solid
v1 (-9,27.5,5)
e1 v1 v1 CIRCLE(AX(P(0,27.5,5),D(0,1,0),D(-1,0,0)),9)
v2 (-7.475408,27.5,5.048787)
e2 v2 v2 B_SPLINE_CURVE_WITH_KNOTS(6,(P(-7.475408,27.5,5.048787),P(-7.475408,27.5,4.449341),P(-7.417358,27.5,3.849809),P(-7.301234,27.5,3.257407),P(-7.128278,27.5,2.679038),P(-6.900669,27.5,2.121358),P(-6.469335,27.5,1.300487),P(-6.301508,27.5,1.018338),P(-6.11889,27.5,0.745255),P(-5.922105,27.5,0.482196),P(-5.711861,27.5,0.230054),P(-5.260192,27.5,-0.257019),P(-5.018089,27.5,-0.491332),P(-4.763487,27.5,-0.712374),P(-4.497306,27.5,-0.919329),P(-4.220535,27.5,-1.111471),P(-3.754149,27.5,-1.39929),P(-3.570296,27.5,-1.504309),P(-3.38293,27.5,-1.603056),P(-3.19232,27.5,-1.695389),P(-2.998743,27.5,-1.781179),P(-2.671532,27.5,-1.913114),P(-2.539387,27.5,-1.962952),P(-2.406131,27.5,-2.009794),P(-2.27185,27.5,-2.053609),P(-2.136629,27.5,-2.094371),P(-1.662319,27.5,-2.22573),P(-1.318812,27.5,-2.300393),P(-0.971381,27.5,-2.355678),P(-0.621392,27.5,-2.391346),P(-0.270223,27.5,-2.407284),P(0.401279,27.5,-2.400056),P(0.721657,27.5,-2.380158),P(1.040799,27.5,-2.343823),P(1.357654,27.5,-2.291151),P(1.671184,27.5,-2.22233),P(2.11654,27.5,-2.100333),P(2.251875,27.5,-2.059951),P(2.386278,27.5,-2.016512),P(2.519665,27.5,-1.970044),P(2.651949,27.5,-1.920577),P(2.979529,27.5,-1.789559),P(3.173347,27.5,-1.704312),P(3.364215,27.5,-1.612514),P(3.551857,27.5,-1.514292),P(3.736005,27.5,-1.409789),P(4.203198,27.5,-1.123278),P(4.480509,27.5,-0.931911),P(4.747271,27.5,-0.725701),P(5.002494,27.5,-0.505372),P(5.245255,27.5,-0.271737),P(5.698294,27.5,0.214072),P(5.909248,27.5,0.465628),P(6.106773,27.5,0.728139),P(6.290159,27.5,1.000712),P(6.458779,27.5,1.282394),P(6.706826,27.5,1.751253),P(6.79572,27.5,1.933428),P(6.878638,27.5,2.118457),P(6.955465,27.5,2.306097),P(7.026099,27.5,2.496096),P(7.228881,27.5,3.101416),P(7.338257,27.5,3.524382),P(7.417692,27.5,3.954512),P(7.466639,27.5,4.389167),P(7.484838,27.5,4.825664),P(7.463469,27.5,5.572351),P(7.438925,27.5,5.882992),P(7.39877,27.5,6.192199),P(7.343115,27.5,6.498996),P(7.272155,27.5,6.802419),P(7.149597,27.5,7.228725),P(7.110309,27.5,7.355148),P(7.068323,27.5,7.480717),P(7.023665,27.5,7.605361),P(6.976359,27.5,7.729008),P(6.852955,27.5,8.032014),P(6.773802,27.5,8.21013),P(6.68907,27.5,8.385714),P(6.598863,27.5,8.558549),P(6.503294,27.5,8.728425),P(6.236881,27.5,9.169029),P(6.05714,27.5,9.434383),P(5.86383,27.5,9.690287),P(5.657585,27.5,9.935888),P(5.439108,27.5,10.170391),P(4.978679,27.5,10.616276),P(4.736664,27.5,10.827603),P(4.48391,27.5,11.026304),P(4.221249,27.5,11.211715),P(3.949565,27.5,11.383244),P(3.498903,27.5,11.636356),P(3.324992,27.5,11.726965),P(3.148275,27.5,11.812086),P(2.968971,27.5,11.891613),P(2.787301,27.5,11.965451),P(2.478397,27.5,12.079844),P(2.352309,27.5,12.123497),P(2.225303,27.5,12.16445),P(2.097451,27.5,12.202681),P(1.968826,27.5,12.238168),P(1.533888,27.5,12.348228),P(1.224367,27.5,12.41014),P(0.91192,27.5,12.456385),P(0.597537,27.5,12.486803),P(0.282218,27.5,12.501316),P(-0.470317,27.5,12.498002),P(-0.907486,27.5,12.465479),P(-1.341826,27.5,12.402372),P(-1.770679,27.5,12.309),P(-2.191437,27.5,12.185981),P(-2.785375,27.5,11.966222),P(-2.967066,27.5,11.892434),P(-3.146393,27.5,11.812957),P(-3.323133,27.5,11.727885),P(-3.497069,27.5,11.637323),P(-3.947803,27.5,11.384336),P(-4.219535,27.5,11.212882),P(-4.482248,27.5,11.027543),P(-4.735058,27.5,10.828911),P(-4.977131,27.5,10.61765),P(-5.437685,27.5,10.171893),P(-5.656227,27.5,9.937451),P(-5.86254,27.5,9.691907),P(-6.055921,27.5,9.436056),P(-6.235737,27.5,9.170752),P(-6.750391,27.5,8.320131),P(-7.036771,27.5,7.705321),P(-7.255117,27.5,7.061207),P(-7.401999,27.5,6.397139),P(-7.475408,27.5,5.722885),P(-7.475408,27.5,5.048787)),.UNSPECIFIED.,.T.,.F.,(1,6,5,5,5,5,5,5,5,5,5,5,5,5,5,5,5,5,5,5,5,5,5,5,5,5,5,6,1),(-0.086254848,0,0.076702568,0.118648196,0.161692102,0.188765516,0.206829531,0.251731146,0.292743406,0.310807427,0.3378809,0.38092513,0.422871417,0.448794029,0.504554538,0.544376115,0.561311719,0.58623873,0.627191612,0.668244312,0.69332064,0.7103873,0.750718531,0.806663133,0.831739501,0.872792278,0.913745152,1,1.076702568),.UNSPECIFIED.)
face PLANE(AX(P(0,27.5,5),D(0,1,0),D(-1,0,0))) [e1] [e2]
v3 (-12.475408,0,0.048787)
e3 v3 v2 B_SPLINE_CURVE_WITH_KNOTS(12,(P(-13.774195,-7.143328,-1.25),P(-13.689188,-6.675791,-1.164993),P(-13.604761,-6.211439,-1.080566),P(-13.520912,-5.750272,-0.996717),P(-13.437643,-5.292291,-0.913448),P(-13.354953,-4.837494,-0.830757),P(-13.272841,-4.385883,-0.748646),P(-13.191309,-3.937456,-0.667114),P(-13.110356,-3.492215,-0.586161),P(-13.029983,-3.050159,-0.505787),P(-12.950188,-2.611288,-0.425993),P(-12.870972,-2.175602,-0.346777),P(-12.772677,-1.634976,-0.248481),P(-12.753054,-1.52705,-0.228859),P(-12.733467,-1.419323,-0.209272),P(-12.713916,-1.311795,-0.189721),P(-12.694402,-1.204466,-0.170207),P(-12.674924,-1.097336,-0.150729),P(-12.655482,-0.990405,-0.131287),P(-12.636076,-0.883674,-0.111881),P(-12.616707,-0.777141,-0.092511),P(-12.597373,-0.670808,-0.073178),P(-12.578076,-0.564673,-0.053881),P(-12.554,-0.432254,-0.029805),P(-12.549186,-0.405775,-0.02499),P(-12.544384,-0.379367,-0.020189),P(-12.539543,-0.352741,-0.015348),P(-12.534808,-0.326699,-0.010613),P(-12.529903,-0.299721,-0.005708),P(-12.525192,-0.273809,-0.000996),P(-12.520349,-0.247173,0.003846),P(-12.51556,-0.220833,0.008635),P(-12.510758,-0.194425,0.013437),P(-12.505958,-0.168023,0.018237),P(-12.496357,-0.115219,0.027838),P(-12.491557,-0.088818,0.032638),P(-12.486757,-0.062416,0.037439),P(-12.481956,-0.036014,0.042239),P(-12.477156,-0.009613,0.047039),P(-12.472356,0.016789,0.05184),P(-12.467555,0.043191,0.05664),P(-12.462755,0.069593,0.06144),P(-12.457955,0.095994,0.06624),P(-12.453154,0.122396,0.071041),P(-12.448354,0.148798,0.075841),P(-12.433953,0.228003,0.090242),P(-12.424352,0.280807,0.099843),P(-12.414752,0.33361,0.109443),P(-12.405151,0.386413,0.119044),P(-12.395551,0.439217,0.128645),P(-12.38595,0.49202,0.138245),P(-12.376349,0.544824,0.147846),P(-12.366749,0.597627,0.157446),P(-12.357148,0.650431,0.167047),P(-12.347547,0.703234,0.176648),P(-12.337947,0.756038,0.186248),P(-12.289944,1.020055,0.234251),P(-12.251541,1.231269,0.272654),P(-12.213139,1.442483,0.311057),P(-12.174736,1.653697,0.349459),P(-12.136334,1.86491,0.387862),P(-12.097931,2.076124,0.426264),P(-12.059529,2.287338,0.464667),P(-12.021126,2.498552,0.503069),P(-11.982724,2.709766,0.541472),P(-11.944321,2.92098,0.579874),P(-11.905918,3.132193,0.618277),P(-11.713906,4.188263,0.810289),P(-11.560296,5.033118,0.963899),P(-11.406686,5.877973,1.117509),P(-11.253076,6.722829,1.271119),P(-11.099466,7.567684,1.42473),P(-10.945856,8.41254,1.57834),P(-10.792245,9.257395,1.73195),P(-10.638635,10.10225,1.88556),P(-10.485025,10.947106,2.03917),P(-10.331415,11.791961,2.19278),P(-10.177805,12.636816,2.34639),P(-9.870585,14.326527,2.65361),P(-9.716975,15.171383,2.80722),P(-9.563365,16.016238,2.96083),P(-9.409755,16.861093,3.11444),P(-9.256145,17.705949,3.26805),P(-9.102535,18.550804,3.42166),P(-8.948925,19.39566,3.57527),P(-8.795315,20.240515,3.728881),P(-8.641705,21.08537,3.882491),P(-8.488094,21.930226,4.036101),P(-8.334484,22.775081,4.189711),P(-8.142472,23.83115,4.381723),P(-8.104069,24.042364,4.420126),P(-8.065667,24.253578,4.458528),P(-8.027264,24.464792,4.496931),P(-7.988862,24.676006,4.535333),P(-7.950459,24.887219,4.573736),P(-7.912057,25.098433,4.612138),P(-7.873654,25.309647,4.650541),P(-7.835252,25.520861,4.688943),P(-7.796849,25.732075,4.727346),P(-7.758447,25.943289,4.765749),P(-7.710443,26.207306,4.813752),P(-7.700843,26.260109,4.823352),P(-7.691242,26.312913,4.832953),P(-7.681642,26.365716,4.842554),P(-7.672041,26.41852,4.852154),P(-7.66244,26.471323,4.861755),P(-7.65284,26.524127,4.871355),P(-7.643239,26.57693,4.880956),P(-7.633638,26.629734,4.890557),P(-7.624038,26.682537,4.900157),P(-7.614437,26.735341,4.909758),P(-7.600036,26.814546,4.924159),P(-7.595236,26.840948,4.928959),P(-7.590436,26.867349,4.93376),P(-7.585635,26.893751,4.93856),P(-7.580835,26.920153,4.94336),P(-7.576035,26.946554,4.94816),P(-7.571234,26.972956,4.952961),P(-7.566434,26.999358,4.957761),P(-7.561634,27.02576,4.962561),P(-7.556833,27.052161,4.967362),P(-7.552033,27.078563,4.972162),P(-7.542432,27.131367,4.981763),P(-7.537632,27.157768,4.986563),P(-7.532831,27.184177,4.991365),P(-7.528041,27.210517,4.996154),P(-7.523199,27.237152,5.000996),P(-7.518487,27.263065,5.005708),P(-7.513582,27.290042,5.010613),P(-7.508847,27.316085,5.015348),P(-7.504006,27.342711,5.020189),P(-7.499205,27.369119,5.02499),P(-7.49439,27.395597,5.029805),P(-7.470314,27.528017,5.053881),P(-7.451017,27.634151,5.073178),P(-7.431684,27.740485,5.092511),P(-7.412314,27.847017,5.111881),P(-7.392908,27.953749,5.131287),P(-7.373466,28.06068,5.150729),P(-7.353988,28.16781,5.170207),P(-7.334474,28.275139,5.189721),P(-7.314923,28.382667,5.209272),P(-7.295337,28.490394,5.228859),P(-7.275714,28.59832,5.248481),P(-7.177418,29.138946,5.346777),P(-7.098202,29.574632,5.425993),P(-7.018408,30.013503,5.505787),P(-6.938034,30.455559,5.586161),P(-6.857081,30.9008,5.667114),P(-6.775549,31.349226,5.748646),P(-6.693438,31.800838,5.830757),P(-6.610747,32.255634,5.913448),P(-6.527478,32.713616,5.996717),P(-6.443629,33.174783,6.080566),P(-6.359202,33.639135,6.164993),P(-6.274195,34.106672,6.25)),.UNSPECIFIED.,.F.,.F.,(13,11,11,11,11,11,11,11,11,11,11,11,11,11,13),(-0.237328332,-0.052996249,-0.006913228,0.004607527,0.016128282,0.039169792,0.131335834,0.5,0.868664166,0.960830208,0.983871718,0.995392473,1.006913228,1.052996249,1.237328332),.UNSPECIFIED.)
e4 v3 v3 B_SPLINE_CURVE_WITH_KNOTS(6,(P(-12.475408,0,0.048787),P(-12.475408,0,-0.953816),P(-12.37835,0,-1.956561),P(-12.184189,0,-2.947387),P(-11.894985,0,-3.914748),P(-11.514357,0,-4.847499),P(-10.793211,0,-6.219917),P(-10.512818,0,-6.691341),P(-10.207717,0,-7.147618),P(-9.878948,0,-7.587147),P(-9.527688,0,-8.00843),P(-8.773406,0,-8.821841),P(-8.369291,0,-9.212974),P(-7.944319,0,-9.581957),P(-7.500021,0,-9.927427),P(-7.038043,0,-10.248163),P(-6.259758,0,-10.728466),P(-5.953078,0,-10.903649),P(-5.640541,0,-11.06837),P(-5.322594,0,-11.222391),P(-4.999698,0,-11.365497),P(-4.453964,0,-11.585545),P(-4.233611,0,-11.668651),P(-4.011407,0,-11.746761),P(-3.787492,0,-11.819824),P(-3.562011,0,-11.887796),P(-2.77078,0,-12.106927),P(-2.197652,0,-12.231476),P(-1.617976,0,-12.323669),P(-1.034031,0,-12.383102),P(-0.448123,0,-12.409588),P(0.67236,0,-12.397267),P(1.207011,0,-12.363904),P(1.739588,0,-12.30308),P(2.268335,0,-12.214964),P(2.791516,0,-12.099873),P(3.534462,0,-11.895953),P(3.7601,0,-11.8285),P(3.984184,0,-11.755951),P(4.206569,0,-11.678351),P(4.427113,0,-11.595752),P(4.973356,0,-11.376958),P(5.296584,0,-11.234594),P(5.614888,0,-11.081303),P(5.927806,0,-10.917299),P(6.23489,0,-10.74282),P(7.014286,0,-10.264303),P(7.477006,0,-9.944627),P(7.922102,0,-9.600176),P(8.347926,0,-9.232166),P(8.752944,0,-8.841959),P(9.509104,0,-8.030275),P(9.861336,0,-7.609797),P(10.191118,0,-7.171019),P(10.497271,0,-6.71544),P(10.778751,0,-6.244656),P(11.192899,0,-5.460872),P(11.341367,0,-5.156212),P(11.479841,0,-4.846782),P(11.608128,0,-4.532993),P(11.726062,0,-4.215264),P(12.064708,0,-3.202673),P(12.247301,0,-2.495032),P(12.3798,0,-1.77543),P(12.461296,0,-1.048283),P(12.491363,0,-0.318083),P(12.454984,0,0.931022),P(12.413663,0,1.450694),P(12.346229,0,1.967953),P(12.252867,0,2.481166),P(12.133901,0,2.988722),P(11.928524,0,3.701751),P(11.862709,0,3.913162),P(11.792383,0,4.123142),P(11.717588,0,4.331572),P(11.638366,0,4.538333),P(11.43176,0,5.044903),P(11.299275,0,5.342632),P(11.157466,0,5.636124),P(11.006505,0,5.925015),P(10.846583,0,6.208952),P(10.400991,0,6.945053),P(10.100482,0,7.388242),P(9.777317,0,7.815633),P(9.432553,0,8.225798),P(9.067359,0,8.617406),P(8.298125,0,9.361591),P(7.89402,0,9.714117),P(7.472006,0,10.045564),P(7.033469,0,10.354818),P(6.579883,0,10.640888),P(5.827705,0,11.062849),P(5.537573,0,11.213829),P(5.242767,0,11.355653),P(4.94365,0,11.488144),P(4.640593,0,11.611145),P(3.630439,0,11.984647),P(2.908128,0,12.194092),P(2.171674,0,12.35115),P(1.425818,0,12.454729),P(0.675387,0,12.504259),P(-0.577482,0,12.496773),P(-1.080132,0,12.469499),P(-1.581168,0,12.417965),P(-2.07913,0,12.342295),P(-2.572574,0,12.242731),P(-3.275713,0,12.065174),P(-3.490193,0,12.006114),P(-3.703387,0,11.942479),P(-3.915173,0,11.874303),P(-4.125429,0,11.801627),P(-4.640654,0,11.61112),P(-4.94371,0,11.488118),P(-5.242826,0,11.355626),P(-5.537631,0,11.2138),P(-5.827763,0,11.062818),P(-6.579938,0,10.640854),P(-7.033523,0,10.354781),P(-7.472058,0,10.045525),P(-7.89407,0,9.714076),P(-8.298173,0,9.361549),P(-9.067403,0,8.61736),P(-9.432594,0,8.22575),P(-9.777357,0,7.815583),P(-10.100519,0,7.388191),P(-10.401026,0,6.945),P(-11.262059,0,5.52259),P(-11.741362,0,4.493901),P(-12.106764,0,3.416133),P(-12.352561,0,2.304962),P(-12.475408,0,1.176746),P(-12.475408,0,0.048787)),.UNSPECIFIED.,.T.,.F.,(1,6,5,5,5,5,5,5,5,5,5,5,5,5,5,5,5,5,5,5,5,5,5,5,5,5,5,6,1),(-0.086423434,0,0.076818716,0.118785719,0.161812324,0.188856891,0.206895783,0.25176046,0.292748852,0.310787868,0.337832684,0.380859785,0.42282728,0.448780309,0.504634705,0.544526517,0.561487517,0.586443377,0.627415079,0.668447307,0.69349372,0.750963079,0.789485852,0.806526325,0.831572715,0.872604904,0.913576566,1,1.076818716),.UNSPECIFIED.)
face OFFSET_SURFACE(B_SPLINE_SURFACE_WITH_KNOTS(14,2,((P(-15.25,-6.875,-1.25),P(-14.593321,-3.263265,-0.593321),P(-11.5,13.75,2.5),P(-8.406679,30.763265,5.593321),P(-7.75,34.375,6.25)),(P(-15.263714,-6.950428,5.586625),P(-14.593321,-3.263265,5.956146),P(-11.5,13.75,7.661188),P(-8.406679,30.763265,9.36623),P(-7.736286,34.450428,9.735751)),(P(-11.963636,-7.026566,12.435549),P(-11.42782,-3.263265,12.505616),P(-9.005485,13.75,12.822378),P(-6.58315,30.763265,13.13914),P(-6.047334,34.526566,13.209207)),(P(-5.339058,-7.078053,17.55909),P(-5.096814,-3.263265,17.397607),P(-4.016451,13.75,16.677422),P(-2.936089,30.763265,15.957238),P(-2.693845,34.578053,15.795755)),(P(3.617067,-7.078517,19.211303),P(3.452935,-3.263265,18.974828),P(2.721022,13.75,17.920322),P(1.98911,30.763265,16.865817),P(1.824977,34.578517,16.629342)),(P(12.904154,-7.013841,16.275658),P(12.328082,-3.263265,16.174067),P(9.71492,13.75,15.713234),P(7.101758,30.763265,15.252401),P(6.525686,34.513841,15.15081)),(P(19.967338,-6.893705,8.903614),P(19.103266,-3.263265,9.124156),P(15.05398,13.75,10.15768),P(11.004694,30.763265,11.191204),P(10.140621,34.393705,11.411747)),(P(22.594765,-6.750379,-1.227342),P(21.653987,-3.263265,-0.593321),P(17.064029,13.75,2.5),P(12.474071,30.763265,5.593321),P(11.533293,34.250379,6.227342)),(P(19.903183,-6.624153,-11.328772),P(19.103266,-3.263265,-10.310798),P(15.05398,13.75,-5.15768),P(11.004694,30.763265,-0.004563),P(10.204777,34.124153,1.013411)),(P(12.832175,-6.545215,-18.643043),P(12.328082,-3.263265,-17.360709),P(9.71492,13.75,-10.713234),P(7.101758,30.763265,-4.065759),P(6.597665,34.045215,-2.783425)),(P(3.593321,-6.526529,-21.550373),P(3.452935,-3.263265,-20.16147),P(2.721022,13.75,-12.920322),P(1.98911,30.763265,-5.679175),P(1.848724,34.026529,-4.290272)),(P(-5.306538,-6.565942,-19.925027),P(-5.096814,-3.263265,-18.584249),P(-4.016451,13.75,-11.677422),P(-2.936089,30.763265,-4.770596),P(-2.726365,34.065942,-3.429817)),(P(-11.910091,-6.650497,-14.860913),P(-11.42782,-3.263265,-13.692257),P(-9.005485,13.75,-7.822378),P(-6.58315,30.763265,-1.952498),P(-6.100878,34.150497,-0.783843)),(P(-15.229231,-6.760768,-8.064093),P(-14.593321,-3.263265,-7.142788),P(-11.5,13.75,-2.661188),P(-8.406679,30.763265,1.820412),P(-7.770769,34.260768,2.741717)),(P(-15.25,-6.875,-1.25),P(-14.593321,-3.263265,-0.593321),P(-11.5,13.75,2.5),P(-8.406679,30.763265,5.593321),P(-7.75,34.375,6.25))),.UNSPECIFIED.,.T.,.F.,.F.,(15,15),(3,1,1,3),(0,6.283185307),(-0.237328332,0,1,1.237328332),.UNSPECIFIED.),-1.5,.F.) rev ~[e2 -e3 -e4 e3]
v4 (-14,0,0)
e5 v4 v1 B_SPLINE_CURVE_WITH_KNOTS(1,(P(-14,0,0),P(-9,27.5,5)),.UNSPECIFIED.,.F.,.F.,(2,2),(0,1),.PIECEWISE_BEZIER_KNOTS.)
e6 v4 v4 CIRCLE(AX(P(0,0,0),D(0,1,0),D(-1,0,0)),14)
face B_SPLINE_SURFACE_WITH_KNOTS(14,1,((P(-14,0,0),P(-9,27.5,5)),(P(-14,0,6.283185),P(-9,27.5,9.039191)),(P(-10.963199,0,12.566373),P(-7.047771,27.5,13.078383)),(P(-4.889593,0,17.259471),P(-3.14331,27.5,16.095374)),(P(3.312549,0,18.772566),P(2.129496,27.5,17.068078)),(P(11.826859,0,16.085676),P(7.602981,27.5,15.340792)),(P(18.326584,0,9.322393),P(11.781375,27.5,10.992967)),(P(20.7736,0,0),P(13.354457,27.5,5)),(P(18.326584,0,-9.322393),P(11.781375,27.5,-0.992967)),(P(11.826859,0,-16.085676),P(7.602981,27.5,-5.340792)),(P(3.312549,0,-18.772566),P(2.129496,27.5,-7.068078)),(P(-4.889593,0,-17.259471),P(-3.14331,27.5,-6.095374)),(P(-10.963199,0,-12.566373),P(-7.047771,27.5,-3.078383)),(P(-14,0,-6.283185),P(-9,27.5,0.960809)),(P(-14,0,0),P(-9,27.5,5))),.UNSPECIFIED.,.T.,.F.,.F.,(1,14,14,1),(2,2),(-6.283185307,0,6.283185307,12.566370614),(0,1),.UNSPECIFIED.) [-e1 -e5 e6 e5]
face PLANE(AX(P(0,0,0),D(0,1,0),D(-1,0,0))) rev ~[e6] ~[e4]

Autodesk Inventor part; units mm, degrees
ref_plane "YZ Plane" through (0, 0, 0) normal (1, 0, 0) x (0, 1, 0)
ref_plane "XY Plane" through (0, 0, 0) normal (0, 0, 1) x (1, 0, 0)
sketch "Szkic6" plane through (0, 0, 0) normal (0, 1, 0) x (-1, 0, 0)
  circle A0 centre (0, 0) radius 14
  dimension "d33" = 28
ref_plane "Płaszczyzna konstrukcyjna1" through (0, 27.5, 0) normal (0, 1, 0) x (-1, 0, 0)
sketch "Szkic7" plane through (0, 27.5, 0) normal (0, 1, 0) x (-1, 0, 0)
  circle A0 centre (0, 5) radius 9
  line L0 (0, -20.3) -> (0, 20.3) construction
  circle A1 centre (0, 0) radius 14 construction
  dimension "d35" = 18
loft "Wyciągnięcie złożone1" add profiles "Szkic6", "Szkic7"
shell "Skorupa1" thickness 1.5 removed faces 2 at (0.4234, 27.5, 2.531) at (-0.5625, 0, 1.5565)
equation "\"d33\" = OD1"
equation "\"d35\" = OD2"
equation "\"d52\" = THK"
equation "\"SzerokośćGięciaPodcięcia\" = Grubość"
equation "\"RozmiarPodcięciaNarożnika\" = 4 * Grubość"
equation "\"PromieńPrzejścia\" = PromieńGięcia"
equation "\"Rozmiar_promienia_Jacobiego\" = PromieńGięcia"
equation "\"Wielk_odstępu\" = Grubość"
equation "\"d2\" = PromieńGięcia"
equation "\"d23\" = PromieńGięcia"
equation "\"OD1\" = 28"
equation "\"OD2\" = 18"
equation "\"L\" = 27.5"
equation "\"THK\" = 1.5"
equation "\"d34\" = L"
equation "\"Grubość\" = 1.5"
equation "\"PromieńGięcia\" = 3"
properties part number "Redukcja asymetryczna Ø28x18x1,5 L=27,5" material "304"
